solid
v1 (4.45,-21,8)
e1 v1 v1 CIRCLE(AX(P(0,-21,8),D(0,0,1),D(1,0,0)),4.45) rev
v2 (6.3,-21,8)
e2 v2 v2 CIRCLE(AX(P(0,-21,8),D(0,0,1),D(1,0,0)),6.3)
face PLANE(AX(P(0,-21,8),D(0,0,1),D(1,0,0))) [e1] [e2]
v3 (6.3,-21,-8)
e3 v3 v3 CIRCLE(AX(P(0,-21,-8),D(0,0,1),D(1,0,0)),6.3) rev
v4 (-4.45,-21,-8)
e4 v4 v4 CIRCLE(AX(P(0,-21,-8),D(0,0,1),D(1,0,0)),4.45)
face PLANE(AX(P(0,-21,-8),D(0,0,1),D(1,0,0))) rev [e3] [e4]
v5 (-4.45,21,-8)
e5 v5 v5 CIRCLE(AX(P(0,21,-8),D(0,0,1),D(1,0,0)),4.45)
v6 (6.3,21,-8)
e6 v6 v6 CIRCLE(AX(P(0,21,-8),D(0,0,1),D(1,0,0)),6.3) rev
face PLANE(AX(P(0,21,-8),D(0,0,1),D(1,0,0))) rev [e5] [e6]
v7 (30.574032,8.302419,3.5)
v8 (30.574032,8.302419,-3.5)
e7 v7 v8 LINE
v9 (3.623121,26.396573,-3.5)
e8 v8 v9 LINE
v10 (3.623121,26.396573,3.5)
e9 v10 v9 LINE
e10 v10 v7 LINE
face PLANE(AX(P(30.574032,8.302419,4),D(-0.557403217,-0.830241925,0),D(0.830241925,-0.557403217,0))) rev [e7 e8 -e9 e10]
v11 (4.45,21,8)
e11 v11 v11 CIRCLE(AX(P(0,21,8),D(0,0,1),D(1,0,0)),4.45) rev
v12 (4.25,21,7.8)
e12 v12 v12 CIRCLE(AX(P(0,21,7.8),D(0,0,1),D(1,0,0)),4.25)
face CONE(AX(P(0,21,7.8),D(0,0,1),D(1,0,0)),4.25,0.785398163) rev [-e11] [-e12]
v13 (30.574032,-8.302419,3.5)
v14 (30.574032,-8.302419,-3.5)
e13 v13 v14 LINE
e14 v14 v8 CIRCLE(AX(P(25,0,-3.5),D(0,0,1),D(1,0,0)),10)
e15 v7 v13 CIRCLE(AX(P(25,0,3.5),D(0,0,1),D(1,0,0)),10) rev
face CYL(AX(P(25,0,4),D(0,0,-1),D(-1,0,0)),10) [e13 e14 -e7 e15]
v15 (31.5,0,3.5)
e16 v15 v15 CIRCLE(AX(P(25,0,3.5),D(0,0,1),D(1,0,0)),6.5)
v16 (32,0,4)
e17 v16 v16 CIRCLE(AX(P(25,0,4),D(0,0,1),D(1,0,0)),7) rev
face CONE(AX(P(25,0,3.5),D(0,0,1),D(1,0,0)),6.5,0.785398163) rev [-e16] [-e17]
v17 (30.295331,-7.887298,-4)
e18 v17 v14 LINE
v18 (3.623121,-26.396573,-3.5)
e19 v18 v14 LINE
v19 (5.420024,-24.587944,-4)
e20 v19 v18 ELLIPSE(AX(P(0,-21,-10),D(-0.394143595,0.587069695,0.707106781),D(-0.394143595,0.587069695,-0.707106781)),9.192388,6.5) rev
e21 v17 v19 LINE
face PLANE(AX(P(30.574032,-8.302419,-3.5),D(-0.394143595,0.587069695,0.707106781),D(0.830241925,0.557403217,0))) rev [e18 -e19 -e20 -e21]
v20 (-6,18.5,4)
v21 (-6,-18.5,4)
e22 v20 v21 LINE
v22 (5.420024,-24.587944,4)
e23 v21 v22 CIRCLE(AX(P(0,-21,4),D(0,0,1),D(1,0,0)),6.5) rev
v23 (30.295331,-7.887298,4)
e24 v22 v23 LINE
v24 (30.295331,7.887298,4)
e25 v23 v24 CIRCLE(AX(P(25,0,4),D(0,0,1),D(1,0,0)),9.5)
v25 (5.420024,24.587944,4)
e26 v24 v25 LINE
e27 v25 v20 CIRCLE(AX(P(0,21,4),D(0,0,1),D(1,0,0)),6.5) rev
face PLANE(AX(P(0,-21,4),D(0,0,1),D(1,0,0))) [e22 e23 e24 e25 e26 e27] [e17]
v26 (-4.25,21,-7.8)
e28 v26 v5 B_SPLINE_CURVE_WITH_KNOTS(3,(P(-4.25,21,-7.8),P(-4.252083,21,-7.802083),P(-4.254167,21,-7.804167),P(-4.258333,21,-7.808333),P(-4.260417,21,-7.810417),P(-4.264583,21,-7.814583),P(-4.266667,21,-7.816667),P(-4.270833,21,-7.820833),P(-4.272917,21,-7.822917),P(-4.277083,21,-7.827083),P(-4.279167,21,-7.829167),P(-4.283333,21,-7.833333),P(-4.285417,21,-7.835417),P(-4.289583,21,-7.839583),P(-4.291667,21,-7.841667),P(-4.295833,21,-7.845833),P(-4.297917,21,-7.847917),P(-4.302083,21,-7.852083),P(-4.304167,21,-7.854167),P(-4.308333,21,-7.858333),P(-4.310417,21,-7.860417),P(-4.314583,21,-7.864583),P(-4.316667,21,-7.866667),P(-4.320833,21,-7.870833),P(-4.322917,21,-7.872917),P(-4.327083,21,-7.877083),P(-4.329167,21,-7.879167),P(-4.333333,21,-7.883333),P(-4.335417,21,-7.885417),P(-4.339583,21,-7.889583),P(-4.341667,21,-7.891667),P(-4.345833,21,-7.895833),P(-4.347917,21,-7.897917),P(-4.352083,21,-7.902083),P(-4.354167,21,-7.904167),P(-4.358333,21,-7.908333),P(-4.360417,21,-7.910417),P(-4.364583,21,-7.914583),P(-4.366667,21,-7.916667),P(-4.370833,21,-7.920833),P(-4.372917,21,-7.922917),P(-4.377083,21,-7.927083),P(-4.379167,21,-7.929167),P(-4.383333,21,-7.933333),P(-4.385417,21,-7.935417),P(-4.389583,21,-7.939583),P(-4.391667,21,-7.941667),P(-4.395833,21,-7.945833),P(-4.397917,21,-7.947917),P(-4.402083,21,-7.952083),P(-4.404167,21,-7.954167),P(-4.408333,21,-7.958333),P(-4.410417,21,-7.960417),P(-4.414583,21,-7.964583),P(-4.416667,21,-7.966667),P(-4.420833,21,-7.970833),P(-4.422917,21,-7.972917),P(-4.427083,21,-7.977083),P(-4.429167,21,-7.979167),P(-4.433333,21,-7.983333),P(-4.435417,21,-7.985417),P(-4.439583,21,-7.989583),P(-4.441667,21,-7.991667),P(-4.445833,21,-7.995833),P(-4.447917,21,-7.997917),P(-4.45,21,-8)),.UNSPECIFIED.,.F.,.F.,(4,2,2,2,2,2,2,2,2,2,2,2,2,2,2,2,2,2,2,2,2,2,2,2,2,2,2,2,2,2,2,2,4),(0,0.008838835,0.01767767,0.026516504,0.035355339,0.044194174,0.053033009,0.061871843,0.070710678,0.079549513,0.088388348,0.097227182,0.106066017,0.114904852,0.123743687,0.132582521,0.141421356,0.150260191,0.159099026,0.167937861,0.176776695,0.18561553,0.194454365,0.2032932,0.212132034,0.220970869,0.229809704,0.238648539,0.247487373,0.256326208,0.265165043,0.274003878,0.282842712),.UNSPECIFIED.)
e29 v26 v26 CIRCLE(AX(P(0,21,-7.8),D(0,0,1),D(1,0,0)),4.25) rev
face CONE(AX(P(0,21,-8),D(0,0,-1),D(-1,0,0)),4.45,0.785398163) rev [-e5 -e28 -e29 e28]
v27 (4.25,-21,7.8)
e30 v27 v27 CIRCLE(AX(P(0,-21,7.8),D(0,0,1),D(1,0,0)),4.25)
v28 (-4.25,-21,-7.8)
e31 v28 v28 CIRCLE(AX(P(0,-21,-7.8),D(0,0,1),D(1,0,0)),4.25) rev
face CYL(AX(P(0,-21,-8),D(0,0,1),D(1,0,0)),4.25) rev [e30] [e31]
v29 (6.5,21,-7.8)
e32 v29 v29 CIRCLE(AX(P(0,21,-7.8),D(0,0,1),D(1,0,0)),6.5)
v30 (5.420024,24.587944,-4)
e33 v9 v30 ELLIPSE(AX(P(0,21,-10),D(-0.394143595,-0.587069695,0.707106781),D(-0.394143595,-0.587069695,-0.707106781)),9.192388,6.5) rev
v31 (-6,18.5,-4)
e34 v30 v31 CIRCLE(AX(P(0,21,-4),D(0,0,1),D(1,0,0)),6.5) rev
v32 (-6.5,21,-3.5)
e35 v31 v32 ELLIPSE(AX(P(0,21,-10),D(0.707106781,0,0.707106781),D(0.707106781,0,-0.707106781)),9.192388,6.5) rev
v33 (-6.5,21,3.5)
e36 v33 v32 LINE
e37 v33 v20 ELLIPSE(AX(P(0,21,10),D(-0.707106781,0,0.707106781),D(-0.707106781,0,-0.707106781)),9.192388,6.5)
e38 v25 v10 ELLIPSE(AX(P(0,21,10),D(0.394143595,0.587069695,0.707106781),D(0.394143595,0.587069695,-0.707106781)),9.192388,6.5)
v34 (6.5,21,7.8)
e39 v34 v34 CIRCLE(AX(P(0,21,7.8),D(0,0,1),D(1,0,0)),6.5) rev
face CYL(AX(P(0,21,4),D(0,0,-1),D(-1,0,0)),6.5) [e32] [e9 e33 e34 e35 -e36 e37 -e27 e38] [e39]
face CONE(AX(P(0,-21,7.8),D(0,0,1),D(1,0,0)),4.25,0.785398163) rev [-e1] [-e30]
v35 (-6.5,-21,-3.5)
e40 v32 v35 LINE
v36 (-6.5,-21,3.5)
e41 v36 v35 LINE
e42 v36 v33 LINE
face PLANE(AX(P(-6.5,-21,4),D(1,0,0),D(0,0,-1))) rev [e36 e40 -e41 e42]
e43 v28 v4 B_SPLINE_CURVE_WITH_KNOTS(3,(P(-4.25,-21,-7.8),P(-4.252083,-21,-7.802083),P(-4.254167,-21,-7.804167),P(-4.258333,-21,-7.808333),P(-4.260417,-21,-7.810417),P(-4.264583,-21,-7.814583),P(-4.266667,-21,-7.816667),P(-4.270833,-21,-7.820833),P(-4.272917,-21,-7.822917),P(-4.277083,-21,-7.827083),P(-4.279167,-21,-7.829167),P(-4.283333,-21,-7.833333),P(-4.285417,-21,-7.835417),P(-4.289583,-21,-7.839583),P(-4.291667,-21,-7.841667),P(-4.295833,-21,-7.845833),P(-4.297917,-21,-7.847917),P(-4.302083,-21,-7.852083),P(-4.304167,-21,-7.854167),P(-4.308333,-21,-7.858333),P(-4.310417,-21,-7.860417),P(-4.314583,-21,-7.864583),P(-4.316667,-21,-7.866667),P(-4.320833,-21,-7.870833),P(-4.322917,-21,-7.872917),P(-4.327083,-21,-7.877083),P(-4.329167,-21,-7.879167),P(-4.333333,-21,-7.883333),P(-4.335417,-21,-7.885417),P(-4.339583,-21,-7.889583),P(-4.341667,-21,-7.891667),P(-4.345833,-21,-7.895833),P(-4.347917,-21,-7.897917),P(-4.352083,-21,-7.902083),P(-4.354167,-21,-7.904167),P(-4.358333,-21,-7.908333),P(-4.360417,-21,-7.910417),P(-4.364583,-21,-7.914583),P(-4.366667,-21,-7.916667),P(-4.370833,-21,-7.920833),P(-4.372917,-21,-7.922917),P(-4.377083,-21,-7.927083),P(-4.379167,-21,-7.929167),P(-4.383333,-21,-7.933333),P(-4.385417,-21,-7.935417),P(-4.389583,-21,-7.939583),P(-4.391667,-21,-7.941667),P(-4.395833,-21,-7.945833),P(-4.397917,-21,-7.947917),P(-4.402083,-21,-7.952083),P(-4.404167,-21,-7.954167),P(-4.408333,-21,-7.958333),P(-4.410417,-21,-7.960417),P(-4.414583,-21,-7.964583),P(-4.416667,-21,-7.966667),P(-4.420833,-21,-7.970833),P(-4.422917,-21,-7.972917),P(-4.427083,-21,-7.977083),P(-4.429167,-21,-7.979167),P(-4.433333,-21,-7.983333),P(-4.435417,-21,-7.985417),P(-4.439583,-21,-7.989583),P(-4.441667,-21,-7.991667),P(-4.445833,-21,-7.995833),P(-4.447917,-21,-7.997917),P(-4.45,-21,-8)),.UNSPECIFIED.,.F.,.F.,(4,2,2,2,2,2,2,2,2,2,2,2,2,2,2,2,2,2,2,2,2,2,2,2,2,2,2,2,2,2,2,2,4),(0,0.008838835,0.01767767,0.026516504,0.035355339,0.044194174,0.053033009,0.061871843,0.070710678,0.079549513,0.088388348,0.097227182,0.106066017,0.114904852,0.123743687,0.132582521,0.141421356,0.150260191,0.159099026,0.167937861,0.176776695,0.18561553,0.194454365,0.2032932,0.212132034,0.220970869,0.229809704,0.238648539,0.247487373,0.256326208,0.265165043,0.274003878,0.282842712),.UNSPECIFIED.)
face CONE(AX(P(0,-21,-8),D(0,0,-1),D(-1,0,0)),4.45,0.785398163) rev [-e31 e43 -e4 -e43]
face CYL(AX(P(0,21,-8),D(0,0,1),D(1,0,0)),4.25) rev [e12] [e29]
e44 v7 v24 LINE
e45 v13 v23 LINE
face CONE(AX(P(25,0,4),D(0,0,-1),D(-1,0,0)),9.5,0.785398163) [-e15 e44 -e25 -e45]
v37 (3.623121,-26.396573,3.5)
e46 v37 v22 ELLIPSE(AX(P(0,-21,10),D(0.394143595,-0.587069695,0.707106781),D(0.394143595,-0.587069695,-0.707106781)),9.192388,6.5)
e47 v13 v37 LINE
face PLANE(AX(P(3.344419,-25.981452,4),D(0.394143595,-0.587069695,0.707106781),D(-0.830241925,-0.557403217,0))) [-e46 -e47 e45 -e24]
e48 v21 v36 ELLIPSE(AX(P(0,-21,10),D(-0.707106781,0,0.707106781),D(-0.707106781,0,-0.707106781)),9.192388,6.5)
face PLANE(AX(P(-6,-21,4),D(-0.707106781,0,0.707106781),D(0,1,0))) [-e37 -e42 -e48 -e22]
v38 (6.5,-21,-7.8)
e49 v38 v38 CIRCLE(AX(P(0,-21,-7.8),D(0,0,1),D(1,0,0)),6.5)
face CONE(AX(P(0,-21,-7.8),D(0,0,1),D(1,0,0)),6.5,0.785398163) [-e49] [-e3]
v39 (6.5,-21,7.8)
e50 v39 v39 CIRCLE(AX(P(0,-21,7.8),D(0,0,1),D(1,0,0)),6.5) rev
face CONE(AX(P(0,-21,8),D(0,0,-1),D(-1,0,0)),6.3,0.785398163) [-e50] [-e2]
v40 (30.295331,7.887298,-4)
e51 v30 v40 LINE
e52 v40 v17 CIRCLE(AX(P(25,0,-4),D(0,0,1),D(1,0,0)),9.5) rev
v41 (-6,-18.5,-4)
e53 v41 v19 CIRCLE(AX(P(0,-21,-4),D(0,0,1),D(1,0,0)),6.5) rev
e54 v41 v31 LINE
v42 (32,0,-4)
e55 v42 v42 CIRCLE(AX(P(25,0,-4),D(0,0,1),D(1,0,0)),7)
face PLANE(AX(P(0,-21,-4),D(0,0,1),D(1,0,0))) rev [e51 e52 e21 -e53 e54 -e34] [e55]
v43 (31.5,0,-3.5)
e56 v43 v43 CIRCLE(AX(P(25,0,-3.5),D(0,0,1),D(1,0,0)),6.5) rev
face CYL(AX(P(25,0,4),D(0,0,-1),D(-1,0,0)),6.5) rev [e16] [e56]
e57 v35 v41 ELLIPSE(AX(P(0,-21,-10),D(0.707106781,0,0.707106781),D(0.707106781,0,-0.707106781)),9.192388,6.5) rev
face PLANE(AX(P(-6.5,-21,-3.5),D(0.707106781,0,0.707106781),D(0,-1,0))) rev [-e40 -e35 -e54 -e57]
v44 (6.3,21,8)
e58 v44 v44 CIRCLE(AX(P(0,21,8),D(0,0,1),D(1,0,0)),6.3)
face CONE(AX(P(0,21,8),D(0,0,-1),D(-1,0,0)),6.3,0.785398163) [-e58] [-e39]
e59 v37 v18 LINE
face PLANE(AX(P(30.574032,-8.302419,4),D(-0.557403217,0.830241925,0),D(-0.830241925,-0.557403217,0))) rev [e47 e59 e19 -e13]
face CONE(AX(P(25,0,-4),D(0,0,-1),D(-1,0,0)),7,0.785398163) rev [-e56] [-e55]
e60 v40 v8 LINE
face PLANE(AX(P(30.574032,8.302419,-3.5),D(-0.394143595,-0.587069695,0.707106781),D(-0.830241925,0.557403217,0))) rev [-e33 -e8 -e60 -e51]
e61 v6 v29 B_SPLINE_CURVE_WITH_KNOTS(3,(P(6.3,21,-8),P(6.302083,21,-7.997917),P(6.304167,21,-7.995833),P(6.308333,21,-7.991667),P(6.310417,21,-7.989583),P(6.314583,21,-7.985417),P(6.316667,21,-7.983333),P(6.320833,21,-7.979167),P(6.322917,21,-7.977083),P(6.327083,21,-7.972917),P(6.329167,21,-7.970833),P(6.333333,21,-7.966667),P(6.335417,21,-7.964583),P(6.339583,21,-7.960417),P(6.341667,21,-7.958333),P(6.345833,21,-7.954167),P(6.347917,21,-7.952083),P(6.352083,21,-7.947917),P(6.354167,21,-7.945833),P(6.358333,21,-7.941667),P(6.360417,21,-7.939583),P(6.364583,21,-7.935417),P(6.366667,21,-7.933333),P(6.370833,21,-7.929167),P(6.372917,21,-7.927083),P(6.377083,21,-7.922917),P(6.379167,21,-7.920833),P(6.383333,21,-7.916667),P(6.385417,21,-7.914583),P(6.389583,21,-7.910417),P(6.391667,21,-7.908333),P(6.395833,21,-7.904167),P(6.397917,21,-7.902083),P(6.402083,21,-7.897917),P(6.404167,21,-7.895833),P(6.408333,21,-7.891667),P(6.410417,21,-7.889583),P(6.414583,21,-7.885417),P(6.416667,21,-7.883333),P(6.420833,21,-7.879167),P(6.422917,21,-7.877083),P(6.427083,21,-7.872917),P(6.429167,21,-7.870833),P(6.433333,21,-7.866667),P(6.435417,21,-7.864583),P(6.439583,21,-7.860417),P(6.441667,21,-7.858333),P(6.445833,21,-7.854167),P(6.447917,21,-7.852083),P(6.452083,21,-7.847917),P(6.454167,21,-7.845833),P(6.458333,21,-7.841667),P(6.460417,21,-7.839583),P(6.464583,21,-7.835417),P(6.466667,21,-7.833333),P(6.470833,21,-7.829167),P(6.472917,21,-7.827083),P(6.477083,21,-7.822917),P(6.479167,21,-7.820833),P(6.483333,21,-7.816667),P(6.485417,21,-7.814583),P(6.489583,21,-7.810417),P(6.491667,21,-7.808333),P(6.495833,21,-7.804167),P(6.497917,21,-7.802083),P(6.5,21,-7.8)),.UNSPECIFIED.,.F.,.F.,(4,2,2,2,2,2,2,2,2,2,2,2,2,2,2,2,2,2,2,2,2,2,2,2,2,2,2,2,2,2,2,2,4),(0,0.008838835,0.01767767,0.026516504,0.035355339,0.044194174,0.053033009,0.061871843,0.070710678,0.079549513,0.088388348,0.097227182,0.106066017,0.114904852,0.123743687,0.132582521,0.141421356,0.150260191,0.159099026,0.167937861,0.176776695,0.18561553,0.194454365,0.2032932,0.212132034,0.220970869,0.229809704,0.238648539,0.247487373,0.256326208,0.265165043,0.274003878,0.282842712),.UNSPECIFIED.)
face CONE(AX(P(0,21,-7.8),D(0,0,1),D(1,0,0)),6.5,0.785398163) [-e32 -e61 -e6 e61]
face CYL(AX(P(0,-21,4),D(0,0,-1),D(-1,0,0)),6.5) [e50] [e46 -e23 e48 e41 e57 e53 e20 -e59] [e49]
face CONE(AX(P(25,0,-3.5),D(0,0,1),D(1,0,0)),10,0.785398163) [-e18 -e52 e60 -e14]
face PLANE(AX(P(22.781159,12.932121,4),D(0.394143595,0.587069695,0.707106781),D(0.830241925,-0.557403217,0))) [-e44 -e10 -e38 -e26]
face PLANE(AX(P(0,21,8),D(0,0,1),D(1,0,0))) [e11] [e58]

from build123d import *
from build123d.topology import SkipClean

# Parameters (mm, degrees)
SKETCH1_R           = 6.5
BOSS_EXTRUDE1_DEPTH = 4
SKETCH2_R           = 6.5
BOSS_EXTRUDE2_DEPTH = 8
SKETCH3_R           = 4.25
CUT_EXTRUDE4_DEPTH  = 48.299577165
CHAMFER2_SIZE       = 0.2
CHAMFER3_SIZE       = 0.5


with BuildPart() as part:
    # Sketch1 → Boss-Extrude1 (new, symmetric)
    with BuildSketch(Plane.XY):
        with BuildLine():
            Line((-6.5, -21), (-6.5, 21))
            ThreePointArc((-6.5, 21), (-3.057753594, 26.735864622), (3.62312091, 26.396572512))
            Line((3.62312091, 26.396572512), (30.574032169, 8.302419249))
            ThreePointArc((30.574032169, 8.302419249), (35, 0), (30.574032169, -8.302419249))
            Line((30.574032169, -8.302419249), (3.62312091, -26.396572512))
            ThreePointArc((3.62312091, -26.396572512), (-3.057753594, -26.735864622), (-6.5, -21))
        make_face()
        with Locations((25, 0)):
            Circle(SKETCH1_R, mode=Mode.SUBTRACT)
    extrude(amount=BOSS_EXTRUDE1_DEPTH, both=True)

    # Sketch2 → Boss-Extrude2 (add, symmetric)
    with SkipClean():  # the faces are left unmerged after this step: merging them gives an invalid solid
        with BuildSketch(Plane.XY):
            with Locations((0, 21)):
                Circle(SKETCH2_R)
            with Locations((0, -21)):
                Circle(SKETCH2_R)
        extrude(amount=BOSS_EXTRUDE2_DEPTH, both=True)
    add(part.part.scale(1), mode=Mode.REPLACE)  # the faces are merged on a copy

    # Sketch3 → Cut-Extrude4 (cut, through all)
    with BuildSketch(Plane.XY.offset(8)):
        with Locations((0, 21)):
            Circle(SKETCH3_R)
        with Locations((0, -21)):
            Circle(SKETCH3_R)
    extrude(amount=-CUT_EXTRUDE4_DEPTH, mode=Mode.SUBTRACT)

    # Chamfer2
    chamfer2_edges = [part.edges().sort_by_distance(p)[0] for p in [
        (-6.5, 21, -8),
        (-6.5, 21, 8),
        (-6.5, -21, -8),
        (-6.5, -21, 8),
        (-4.25, 21, -8),
        (-4.25, 21, 8),
        (-4.25, -21, -8),
        (-4.25, -21, 8),
    ]]
    chamfer(chamfer2_edges, length=CHAMFER2_SIZE)

    # Chamfer3
    # the kernel refuses this chamfer: 0.5 mm, written as the material it takes off along each edge
    with BuildSketch(Plane(origin=(25, 0, 4), x_dir=(0.557403216886901, 0.8302419248653579, 0), z_dir=(-0.8302419248653579, 0.557403216886901, 0))) as chamfer3_piece_1:
        Polygon((10, CHAMFER3_SIZE), (10 - CHAMFER3_SIZE, 0), (10, 0), align=None)
    revolve(axis=Axis((25, 0, 4), (0, 0, -1)), revolution_arc=112.247195119, mode=Mode.SUBTRACT)
    with BuildSketch(Plane(origin=(2.555561393, 27.113304697, 4), x_dir=(0.01532629007386634, 0.022828229523033896, -0.9996219169112968), z_dir=(0.8302419248653579, -0.5574032168869009, 0))) as chamfer3_piece_2_section:
        Polygon((CHAMFER3_SIZE * 0.999621916911, -CHAMFER3_SIZE * 0.0274958766106), (-CHAMFER3_SIZE * 0.0274958766106, -CHAMFER3_SIZE * 0.999621916911), (0, 0), align=None)
    chamfer3_piece_2 = extrude(amount=33.74735717, mode=Mode.PRIVATE)
    chamfer3_piece_2 = chamfer3_piece_2 - Plane(origin=(0, 21, 3.833161129), x_dir=(1, 0, 0), z_dir=(0, 0, 1)) * Cylinder(6.5, 70, mode=Mode.PRIVATE)
    add(chamfer3_piece_2, mode=Mode.SUBTRACT)
    with BuildSketch(Plane(origin=(25, 0, -4), x_dir=(1, 0, 0), z_dir=(0, -1, 0))) as chamfer3_piece_3:
        Polygon((6.5 + CHAMFER3_SIZE, 0), (6.5, CHAMFER3_SIZE), (6.5, 0), align=None)
    revolve(axis=Axis((25, 0, -4), (0, 0, 1)), mode=Mode.SUBTRACT)
    with BuildSketch(Plane(origin=(25, 0, 4), x_dir=(1, 0, 0), z_dir=(0, -1, 0))) as chamfer3_piece_4:
        Polygon((6.5, -CHAMFER3_SIZE), (6.5 + CHAMFER3_SIZE, 0), (6.5, 0), align=None)
    revolve(axis=Axis((25, 0, 4), (0, 0, 1)), mode=Mode.SUBTRACT)
    with BuildSketch(Plane(origin=(-6.5, -22.285841494, 4), x_dir=(-0.027495876610585623, 0, -0.9996219169112968), z_dir=(0, 1, 0))) as chamfer3_piece_5_section:
        Polygon((CHAMFER3_SIZE * 0.999621916911, -CHAMFER3_SIZE * 0.0274958766106), (-CHAMFER3_SIZE * 0.0274958766106, -CHAMFER3_SIZE * 0.999621916911), (0, 0), align=None)
    chamfer3_piece_5 = extrude(amount=44.571682988, mode=Mode.PRIVATE)
    chamfer3_piece_5 = chamfer3_piece_5 - Plane(origin=(0, -21, 3.832044631), x_dir=(1, 0, 0), z_dir=(0, 0, 1)) * Cylinder(6.5, 92, mode=Mode.PRIVATE)
    chamfer3_piece_5 = chamfer3_piece_5 - Plane(origin=(0, 21, 3.832044631), x_dir=(1, 0, 0), z_dir=(0, 0, 1)) * Cylinder(6.5, 92, mode=Mode.PRIVATE)
    add(chamfer3_piece_5, mode=Mode.SUBTRACT)
    with BuildSketch(Plane(origin=(-6.5, -22.285841494, -4), x_dir=(0.9996219169112968, 0, -0.027495876610585647), z_dir=(0, 1, 0))) as chamfer3_piece_6_section:
        Polygon((CHAMFER3_SIZE * 0.999621916911, -CHAMFER3_SIZE * 0.0274958766106), (-CHAMFER3_SIZE * 0.0274958766106, -CHAMFER3_SIZE * 0.999621916911), (0, 0), align=None)
    chamfer3_piece_6 = extrude(amount=44.571682988, mode=Mode.PRIVATE)
    chamfer3_piece_6 = chamfer3_piece_6 - Plane(origin=(0, -21, -3.832044585), x_dir=(1, 0, 0), z_dir=(0, 0, 1)) * Cylinder(6.5, 92, mode=Mode.PRIVATE)
    chamfer3_piece_6 = chamfer3_piece_6 - Plane(origin=(0, 21, -3.832044585), x_dir=(1, 0, 0), z_dir=(0, 0, 1)) * Cylinder(6.5, 92, mode=Mode.PRIVATE)
    add(chamfer3_piece_6, mode=Mode.SUBTRACT)
    with BuildSketch(Plane(origin=(2.555561393, 27.113304697, -4), x_dir=(-0.5571924721570072, -0.8299280244340339, -0.027495876610585664), z_dir=(0.8302419248653579, -0.5574032168869009, 0))) as chamfer3_piece_7_section:
        Polygon((CHAMFER3_SIZE * 0.999621916911, -CHAMFER3_SIZE * 0.0274958766106), (-CHAMFER3_SIZE * 0.0274958766106, -CHAMFER3_SIZE * 0.999621916911), (0, 0), align=None)
    chamfer3_piece_7 = extrude(amount=33.74735717, mode=Mode.PRIVATE)
    chamfer3_piece_7 = chamfer3_piece_7 - Plane(origin=(0, 21, -3.833161129), x_dir=(1, 0, 0), z_dir=(0, 0, 1)) * Cylinder(6.5, 70, mode=Mode.PRIVATE)
    add(chamfer3_piece_7, mode=Mode.SUBTRACT)
    with BuildSketch(Plane(origin=(25, 0, -4), x_dir=(0.557403216886901, 0.8302419248653579, 0), z_dir=(-0.8302419248653579, 0.557403216886901, 0))) as chamfer3_piece_8:
        Polygon((10 - CHAMFER3_SIZE, 0), (10, -CHAMFER3_SIZE), (10, 0), align=None)
    revolve(axis=Axis((25, 0, -4), (0, 0, -1)), revolution_arc=112.247195119, mode=Mode.SUBTRACT)
    with BuildSketch(Plane(origin=(30.574032169, -8.302419249, -4), x_dir=(-0.5571924721570071, 0.8299280244340339, -0.027495876610585612), z_dir=(-0.8302419248653579, -0.5574032168869009, 0))) as chamfer3_piece_9_section:
        Polygon((CHAMFER3_SIZE * 0.999621916911, -CHAMFER3_SIZE * 0.0274958766106), (-CHAMFER3_SIZE * 0.0274958766106, -CHAMFER3_SIZE * 0.999621916911), (0, 0), align=None)
    chamfer3_piece_9 = extrude(amount=33.74735717, mode=Mode.PRIVATE)
    chamfer3_piece_9 = chamfer3_piece_9 - Plane(origin=(0, -21, -3.833161128), x_dir=(1, 0, 0), z_dir=(0, 0, 1)) * Cylinder(6.5, 70, mode=Mode.PRIVATE)
    add(chamfer3_piece_9, mode=Mode.SUBTRACT)
    with BuildSketch(Plane(origin=(30.574032169, -8.302419249, 4), x_dir=(0.015326290073865267, -0.022828229523032303, -0.9996219169112968), z_dir=(-0.8302419248653579, -0.5574032168869009, 0))) as chamfer3_piece_10_section:
        Polygon((CHAMFER3_SIZE * 0.999621916911, -CHAMFER3_SIZE * 0.0274958766106), (-CHAMFER3_SIZE * 0.0274958766106, -CHAMFER3_SIZE * 0.999621916911), (0, 0), align=None)
    chamfer3_piece_10 = extrude(amount=33.74735717, mode=Mode.PRIVATE)
    chamfer3_piece_10 = chamfer3_piece_10 - Plane(origin=(0, -21, 3.833161129), x_dir=(1, 0, 0), z_dir=(0, 0, 1)) * Cylinder(6.5, 70, mode=Mode.PRIVATE)
    add(chamfer3_piece_10, mode=Mode.SUBTRACT)


solid = part.part
